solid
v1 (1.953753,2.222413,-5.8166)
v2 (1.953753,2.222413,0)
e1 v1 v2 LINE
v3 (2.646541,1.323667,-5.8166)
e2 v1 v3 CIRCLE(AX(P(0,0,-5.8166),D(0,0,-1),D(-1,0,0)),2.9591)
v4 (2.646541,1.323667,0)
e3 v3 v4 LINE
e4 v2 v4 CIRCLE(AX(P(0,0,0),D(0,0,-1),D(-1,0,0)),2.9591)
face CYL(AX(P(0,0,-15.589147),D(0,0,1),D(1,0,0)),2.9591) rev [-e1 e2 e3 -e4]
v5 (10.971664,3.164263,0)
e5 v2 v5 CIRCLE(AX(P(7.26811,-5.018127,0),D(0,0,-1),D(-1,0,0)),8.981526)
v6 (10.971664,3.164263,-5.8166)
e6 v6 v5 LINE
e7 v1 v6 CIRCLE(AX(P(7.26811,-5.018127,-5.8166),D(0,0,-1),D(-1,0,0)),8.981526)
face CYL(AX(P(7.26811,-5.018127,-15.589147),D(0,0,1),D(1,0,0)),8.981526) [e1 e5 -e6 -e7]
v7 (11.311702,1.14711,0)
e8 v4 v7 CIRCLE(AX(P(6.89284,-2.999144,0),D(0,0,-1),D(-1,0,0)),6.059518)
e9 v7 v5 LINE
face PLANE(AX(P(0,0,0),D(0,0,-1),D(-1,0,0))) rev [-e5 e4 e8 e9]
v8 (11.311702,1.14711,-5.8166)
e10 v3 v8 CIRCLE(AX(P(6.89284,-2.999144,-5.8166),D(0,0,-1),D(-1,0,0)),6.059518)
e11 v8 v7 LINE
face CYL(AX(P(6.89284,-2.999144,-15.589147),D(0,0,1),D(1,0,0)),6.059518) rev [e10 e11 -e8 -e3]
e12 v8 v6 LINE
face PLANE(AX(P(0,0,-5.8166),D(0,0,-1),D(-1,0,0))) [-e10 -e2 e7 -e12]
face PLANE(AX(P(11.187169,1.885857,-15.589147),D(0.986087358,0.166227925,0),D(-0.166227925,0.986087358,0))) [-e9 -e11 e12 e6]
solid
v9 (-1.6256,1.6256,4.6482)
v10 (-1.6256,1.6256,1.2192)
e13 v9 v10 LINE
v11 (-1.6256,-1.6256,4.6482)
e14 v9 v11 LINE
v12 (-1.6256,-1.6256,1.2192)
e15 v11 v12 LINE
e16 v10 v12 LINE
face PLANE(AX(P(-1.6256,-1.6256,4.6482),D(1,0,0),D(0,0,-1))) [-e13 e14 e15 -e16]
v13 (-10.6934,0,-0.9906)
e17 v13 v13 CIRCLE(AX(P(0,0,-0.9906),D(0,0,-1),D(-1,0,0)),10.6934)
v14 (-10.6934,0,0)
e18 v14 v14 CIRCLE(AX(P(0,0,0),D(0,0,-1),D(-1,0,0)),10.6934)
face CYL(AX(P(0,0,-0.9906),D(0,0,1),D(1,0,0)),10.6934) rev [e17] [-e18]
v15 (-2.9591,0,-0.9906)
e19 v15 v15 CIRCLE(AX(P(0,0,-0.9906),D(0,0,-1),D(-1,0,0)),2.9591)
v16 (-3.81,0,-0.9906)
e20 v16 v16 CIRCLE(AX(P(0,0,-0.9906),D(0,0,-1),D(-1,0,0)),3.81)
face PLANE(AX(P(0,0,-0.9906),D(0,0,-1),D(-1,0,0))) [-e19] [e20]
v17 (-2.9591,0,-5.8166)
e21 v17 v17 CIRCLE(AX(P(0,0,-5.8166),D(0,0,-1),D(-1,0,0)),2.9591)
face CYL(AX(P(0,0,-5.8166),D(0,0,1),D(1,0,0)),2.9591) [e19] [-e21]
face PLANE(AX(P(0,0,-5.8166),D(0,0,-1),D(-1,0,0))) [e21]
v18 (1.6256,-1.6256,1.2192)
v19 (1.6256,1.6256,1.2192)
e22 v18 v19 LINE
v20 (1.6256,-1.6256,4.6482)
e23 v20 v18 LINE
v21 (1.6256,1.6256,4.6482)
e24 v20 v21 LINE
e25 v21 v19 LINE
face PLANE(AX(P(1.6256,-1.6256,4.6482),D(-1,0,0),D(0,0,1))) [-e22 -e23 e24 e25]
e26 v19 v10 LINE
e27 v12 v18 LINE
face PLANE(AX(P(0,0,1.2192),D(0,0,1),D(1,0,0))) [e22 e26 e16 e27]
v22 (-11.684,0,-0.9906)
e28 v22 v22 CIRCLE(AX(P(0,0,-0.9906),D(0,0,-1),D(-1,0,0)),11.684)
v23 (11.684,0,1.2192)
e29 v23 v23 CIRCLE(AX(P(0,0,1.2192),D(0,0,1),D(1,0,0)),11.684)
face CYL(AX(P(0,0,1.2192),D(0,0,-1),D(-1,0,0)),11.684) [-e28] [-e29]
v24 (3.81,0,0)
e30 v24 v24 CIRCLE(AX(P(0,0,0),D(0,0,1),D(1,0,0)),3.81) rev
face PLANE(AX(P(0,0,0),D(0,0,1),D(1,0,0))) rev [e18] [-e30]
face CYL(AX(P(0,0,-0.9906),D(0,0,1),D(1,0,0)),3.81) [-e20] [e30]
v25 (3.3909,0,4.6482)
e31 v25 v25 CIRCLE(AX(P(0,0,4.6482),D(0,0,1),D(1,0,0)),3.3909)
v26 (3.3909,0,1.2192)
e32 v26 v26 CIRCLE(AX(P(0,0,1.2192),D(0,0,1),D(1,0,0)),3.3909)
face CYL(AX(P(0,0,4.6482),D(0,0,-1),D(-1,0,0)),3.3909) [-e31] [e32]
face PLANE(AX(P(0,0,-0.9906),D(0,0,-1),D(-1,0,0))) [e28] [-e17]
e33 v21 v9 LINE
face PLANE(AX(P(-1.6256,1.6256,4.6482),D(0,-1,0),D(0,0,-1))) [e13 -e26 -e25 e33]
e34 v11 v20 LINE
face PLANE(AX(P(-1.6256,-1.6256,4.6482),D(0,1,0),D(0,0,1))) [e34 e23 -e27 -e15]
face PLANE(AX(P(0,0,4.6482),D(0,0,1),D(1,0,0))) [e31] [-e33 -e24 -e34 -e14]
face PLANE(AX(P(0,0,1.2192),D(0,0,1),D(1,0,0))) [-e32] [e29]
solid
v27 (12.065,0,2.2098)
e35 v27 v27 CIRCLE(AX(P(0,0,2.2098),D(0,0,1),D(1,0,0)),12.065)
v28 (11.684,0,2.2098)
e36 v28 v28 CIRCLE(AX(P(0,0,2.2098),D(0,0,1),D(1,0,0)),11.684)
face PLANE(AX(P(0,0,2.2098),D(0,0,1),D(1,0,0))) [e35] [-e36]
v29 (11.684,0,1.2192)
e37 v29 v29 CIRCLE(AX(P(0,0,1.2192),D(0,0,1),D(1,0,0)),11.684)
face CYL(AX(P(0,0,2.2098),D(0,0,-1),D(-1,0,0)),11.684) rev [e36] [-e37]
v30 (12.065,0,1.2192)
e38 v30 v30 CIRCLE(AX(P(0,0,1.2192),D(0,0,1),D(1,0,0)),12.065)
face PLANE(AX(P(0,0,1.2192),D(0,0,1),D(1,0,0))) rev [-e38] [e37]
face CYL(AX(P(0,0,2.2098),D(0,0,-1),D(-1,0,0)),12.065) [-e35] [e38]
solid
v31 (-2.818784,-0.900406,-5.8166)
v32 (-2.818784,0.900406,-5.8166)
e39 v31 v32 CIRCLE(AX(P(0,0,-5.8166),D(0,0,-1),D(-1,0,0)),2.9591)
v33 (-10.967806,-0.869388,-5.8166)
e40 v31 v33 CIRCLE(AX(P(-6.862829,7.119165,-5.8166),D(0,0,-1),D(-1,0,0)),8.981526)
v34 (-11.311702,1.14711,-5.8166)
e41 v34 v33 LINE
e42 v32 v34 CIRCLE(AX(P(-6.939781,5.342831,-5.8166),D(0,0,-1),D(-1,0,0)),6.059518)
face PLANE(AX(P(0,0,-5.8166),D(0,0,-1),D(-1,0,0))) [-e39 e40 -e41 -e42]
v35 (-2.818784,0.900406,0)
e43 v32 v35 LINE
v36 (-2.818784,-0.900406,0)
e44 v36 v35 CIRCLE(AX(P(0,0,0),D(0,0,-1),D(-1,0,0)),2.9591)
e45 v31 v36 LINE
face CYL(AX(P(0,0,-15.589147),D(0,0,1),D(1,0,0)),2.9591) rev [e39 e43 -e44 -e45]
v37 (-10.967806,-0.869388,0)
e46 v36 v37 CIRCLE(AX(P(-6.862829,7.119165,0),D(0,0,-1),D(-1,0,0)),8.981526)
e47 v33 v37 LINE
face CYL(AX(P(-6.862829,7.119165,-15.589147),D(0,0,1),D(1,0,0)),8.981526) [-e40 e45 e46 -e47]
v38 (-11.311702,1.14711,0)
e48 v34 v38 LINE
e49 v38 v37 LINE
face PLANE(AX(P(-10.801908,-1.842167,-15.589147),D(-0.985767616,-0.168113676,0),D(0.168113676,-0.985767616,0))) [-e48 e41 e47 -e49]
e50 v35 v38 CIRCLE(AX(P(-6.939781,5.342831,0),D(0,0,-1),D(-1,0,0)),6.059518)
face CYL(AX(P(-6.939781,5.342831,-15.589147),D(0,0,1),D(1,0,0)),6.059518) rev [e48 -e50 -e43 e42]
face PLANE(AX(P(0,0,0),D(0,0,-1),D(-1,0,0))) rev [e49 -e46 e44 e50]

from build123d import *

# Parameters (mm, degrees)
SKETCH1_R           = 11.684
BOSS_EXTRUDE1_DEPTH = 1.2192
SKETCH2_R           = 3.3909
SKETCH2_W           = 3.2512
SKETCH2_H           = 3.2512
BOSS_EXTRUDE2_DEPTH = 3.429
SKETCH3_R           = 12.065
SKETCH3_R_2         = 11.684
BOSS_EXTRUDE3_DEPTH = 0.9906
BOSS_EXTRUDE4_START = 0.9906
SKETCH4_R           = 11.684
SKETCH4_R_2         = 10.6934
SKETCH4_R_3         = 3.81
BOSS_EXTRUDE4_DEPTH = 0.9906
SKETCH5_R           = 2.9591
BOSS_EXTRUDE5_DEPTH = 4.826
BOSS_EXTRUDE7_DEPTH = 5.8166


# Read off the part's stored shape, not the designer's step: Boss-Extrude7
with BuildPart() as part:
    # Sketch1 → Boss-Extrude1 (new body)
    with BuildSketch(Plane.XY):
        Circle(SKETCH1_R)
    extrude(amount=BOSS_EXTRUDE1_DEPTH)

    # Sketch2 → Boss-Extrude2 (add)
    with BuildSketch(Plane.XY.offset(1.2192)):
        Circle(SKETCH2_R)
        Rectangle(SKETCH2_W, SKETCH2_H, mode=Mode.SUBTRACT)
    extrude(amount=BOSS_EXTRUDE2_DEPTH)

    # Sketch4 → Boss-Extrude4 (add)
    # profile 1 of 2: a face of its own
    with BuildSketch(Plane(origin=(0, 0, 0), x_dir=(-1, 0, 0), z_dir=(0, 0, -1)).offset(BOSS_EXTRUDE4_START)):
        with Locations(Location((0, 0, 0), (0, 0, 180))):
            Circle(SKETCH4_R)
        Circle(SKETCH4_R_2, mode=Mode.SUBTRACT)
    # profile 2 of 2: a face of its own
    with BuildSketch(Plane(origin=(0, 0, 0), x_dir=(-1, 0, 0), z_dir=(0, 0, -1)).offset(BOSS_EXTRUDE4_START)):
        with Locations(Location((0, 0, 0), (0, 0, 180))):
            Circle(SKETCH4_R_3)
    extrude(amount=-BOSS_EXTRUDE4_DEPTH)

    # Sketch5 → Boss-Extrude5 (add)
    with BuildSketch(Plane(origin=(0, 0, -0.9906), x_dir=(-1, 0, 0), z_dir=(0, 0, -1))):
        Circle(SKETCH5_R)
    extrude(amount=BOSS_EXTRUDE5_DEPTH)


with BuildPart() as body_2:
    # Sketch3 → Boss-Extrude3 (new body)
    with BuildSketch(Plane.XY.offset(1.2192)):
        Circle(SKETCH3_R)
        Circle(SKETCH3_R_2, mode=Mode.SUBTRACT)
    extrude(amount=BOSS_EXTRUDE3_DEPTH)


with BuildPart() as body_3:
    # Boss-Extrude7 outline → Boss-Extrude7 (new body)
    with BuildSketch(Plane(origin=(0, 0, 0), x_dir=(-1, 0, 0), z_dir=(0, 0, -1))):
        with BuildLine():
            ThreePointArc((-1.953753259, 2.222413331), (-6.3351355, 3.914810369), (-10.971663942, 3.164262512))
            Line((-10.971663942, 3.164262512), (-11.311701793, 1.147110303))
            ThreePointArc((-11.311701793, 1.147110303), (-7.016280611, 3.05911682), (-2.646540618, 1.323667469))
            ThreePointArc((-2.646540618, 1.323667469), (-2.343632217, 1.8065605), (-1.953753259, 2.222413331))
        make_face()
        with BuildLine():
            ThreePointArc((11.311701793, 1.147110303), (7.1157256, -0.714132536), (2.818783903, 0.900405531))
            ThreePointArc((2.818783903, 0.900405531), (2.9591, 0), (2.818783903, -0.900405531))
            ThreePointArc((2.818783903, -0.900405531), (6.897015449, -1.862296256), (10.967806427, -0.869387837))
            Line((10.967806427, -0.869387837), (11.311701793, 1.147110303))
        make_face()
    extrude(amount=BOSS_EXTRUDE7_DEPTH)


solid = Compound([part.part, body_2.part, body_3.part])
